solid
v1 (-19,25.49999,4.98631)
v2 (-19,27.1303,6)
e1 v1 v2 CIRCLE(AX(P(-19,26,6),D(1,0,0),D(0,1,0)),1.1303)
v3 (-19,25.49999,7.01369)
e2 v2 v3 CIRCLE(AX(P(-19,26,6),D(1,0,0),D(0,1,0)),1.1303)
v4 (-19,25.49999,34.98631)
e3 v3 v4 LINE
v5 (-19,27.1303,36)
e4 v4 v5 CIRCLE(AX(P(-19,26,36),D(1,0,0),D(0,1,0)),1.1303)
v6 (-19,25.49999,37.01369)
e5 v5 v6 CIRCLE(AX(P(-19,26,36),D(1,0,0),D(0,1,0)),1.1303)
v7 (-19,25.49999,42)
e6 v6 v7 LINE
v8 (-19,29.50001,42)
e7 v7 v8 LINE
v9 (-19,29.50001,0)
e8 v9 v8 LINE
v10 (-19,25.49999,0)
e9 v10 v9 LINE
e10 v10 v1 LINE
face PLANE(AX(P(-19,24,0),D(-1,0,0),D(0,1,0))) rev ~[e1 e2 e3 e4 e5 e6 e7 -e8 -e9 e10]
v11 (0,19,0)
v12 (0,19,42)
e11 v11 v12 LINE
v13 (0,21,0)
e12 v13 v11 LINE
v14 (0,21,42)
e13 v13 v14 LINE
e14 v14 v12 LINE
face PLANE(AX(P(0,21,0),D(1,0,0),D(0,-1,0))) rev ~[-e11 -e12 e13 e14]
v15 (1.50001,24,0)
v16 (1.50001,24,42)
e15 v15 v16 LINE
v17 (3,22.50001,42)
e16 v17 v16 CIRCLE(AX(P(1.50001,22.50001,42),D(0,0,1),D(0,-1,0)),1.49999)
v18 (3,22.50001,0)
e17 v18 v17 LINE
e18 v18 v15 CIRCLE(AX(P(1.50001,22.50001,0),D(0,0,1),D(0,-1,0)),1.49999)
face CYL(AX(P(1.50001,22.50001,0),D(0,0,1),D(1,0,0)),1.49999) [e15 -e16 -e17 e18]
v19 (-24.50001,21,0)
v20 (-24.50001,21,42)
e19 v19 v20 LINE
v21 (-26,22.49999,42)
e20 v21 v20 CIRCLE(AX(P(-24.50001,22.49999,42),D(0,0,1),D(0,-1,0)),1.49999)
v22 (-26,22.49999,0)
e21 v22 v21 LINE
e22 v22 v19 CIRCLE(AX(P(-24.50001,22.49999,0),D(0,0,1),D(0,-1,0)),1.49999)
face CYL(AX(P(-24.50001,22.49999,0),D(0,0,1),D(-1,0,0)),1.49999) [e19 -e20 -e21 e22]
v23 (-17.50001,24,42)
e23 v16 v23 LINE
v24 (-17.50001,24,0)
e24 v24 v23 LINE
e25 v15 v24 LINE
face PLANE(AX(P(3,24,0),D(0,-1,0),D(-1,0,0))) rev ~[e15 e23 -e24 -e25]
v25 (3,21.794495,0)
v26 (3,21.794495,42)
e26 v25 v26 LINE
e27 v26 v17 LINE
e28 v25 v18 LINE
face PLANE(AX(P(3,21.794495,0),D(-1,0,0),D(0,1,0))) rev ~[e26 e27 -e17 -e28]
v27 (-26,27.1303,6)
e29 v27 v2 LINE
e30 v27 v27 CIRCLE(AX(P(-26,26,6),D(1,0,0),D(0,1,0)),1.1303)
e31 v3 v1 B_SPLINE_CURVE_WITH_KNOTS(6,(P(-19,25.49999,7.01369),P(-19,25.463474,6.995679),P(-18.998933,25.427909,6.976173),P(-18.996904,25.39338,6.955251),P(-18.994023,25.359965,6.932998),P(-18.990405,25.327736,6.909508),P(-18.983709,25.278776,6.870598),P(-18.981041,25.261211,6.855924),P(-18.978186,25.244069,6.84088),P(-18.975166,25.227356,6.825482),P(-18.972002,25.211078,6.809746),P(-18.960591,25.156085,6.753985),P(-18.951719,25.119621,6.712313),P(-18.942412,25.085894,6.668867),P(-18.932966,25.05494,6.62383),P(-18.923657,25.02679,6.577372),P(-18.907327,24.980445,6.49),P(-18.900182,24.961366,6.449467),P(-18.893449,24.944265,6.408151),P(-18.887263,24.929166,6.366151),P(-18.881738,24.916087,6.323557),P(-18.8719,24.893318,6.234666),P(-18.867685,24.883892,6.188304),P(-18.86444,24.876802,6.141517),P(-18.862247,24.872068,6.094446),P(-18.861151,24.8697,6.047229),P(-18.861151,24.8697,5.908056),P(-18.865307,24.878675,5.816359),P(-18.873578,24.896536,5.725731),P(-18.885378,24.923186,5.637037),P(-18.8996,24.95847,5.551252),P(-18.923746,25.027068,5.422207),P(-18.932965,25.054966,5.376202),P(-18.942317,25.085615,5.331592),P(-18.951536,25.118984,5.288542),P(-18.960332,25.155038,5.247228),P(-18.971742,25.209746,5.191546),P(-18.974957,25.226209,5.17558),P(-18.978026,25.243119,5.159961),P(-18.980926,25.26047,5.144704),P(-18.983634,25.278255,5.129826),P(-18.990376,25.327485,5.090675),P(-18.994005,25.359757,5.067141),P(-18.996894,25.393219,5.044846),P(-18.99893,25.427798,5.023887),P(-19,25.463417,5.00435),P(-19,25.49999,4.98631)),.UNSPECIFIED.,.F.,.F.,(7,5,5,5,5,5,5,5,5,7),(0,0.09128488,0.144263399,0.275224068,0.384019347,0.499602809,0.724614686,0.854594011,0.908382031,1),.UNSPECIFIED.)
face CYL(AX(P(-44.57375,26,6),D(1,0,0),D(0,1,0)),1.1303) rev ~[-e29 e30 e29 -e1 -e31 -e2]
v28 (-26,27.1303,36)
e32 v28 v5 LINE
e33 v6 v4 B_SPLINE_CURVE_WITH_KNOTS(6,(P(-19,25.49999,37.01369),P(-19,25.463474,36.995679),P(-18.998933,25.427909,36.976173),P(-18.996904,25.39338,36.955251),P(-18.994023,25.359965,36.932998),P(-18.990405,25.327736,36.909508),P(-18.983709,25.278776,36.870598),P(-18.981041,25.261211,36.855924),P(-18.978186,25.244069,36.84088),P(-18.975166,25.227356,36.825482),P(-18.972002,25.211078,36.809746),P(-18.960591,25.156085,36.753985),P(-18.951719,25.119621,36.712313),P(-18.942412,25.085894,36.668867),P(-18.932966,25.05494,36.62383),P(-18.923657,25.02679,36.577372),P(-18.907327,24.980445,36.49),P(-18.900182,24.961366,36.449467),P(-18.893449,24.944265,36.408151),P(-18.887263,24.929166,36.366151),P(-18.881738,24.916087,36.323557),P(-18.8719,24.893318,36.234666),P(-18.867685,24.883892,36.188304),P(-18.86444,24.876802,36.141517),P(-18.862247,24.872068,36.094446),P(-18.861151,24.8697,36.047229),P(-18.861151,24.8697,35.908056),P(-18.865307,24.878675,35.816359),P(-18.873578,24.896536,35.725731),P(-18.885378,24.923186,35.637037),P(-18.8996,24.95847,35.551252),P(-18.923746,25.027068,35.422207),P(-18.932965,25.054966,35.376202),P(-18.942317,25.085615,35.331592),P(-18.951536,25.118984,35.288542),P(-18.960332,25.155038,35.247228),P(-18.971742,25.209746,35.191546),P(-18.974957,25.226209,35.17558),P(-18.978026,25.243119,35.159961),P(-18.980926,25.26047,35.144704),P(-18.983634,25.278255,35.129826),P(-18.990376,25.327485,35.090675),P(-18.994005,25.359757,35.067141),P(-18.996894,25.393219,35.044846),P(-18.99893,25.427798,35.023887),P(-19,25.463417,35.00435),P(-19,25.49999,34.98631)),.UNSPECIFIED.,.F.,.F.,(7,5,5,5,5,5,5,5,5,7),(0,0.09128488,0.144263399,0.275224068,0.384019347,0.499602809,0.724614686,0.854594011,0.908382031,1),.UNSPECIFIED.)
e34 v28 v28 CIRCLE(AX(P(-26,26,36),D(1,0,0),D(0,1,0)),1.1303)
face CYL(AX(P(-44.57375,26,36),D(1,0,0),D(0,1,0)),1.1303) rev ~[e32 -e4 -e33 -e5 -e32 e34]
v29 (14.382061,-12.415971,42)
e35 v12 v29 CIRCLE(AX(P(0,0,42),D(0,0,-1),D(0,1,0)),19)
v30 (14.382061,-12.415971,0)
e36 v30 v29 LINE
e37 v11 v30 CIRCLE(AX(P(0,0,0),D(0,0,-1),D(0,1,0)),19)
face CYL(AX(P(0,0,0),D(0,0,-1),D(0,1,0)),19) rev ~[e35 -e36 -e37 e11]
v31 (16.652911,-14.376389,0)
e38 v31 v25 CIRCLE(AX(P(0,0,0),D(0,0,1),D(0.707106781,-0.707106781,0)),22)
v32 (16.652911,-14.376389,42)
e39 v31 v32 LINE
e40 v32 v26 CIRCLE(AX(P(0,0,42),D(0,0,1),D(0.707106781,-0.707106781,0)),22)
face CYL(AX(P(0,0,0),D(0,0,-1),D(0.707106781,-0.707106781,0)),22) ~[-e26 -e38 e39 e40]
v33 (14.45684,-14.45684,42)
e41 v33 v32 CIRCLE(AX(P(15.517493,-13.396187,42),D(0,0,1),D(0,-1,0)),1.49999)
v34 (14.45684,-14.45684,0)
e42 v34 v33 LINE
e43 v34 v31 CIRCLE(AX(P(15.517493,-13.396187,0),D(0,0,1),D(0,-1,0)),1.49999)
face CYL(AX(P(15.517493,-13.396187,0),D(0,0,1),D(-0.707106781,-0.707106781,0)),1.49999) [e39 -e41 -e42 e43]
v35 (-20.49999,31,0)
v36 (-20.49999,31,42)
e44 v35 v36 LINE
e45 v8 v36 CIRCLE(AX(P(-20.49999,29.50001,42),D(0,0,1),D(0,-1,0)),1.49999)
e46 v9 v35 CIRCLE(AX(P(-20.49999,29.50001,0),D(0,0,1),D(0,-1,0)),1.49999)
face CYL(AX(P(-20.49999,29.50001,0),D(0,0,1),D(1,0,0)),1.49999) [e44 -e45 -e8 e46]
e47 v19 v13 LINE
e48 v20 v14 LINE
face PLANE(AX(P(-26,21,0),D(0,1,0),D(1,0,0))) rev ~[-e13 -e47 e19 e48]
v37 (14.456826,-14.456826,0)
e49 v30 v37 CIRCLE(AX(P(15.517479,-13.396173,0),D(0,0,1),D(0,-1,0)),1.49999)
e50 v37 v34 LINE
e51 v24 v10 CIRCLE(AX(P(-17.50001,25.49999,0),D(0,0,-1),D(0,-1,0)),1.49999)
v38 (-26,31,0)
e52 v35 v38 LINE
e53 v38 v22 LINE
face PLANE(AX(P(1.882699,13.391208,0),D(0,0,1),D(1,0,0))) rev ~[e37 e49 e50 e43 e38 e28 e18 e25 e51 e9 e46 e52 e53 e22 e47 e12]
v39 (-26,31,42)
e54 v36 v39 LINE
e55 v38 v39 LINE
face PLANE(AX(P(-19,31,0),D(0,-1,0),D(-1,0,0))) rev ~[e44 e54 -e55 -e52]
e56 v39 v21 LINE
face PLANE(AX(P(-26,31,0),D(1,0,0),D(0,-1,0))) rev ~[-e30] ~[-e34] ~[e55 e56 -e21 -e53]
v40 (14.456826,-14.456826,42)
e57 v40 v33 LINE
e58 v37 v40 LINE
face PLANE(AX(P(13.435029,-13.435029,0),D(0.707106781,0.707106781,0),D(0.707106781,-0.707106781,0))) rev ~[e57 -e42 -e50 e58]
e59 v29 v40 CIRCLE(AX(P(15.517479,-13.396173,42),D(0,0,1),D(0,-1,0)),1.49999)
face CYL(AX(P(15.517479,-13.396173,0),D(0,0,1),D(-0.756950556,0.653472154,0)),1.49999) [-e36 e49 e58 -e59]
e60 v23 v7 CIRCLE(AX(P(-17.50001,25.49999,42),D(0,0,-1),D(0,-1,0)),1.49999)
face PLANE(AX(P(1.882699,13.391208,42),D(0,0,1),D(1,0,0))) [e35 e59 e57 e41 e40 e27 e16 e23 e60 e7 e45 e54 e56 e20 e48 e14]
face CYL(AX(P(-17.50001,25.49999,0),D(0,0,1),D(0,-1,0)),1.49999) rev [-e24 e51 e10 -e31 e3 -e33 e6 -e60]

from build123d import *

# Parameters (mm, degrees)
F1_DEPTH = 42
F2_R     = 1.49999
F4_D     = 2.2606
F4_DEPTH = 18.57375
F4_TIP   = 0.6791527577


# Not quite as in the source:
# - a fillet or chamfer is up to 0.001 mm smaller than in the source, because OpenCascade refuses the exact size


with BuildPart() as f1:
    # F0 (on Top) → F1 (new body)
    with BuildSketch(Plane.XY):
        with BuildLine():
            ThreePointArc((0, 19), (17.5537111177, 7.2709852149), (13.4350288425, -13.4350288425))
            Line((13.4350288425, -13.4350288425), (15.5563491861, -15.5563491861))
            ThreePointArc((15.5563491861, -15.5563491861), (20.8531990078, 7.0102846689), (3, 21.7944947177))
            Line((3, 21.7944947177), (3, 24))
            Line((3, 24), (-19, 24))
            Line((-19, 24), (-19, 31))
            Line((-19, 31), (-26, 31))
            Line((-26, 31), (-26, 21))
            Line((-26, 21), (0, 21))
            Line((0, 21), (0, 19))
        make_face()
    extrude(amount=F1_DEPTH)

    # F2 (radius 1.5 in the source; OpenCascade refuses exactly that, so slightly less here)
    f2_edges = [f1.edges().sort_by_distance(p)[0] for p in [
        (13.435029, -13.435029, 21),
        (15.556349, -15.556349, 21),
        (-26, 21, 21),
        (3, 24, 21),
        (-19, 24, 21),
        (-19, 31, 21),
    ]]
    fillet(f2_edges, radius=F2_R)

    # F4
    with Locations(Plane(origin=(-26, 0, 0), x_dir=(0, -1, 0), z_dir=(-1, 0, 0))):
        with Locations((-26, 36), (-26, 6)):
            Hole(F4_D / 2, depth=F4_DEPTH)
            with Locations((0, 0, -(F4_DEPTH + F4_TIP / 2))):  # 118° drill point
                Cone(0, F4_D / 2, F4_TIP, mode=Mode.SUBTRACT)


solid = f1.part
